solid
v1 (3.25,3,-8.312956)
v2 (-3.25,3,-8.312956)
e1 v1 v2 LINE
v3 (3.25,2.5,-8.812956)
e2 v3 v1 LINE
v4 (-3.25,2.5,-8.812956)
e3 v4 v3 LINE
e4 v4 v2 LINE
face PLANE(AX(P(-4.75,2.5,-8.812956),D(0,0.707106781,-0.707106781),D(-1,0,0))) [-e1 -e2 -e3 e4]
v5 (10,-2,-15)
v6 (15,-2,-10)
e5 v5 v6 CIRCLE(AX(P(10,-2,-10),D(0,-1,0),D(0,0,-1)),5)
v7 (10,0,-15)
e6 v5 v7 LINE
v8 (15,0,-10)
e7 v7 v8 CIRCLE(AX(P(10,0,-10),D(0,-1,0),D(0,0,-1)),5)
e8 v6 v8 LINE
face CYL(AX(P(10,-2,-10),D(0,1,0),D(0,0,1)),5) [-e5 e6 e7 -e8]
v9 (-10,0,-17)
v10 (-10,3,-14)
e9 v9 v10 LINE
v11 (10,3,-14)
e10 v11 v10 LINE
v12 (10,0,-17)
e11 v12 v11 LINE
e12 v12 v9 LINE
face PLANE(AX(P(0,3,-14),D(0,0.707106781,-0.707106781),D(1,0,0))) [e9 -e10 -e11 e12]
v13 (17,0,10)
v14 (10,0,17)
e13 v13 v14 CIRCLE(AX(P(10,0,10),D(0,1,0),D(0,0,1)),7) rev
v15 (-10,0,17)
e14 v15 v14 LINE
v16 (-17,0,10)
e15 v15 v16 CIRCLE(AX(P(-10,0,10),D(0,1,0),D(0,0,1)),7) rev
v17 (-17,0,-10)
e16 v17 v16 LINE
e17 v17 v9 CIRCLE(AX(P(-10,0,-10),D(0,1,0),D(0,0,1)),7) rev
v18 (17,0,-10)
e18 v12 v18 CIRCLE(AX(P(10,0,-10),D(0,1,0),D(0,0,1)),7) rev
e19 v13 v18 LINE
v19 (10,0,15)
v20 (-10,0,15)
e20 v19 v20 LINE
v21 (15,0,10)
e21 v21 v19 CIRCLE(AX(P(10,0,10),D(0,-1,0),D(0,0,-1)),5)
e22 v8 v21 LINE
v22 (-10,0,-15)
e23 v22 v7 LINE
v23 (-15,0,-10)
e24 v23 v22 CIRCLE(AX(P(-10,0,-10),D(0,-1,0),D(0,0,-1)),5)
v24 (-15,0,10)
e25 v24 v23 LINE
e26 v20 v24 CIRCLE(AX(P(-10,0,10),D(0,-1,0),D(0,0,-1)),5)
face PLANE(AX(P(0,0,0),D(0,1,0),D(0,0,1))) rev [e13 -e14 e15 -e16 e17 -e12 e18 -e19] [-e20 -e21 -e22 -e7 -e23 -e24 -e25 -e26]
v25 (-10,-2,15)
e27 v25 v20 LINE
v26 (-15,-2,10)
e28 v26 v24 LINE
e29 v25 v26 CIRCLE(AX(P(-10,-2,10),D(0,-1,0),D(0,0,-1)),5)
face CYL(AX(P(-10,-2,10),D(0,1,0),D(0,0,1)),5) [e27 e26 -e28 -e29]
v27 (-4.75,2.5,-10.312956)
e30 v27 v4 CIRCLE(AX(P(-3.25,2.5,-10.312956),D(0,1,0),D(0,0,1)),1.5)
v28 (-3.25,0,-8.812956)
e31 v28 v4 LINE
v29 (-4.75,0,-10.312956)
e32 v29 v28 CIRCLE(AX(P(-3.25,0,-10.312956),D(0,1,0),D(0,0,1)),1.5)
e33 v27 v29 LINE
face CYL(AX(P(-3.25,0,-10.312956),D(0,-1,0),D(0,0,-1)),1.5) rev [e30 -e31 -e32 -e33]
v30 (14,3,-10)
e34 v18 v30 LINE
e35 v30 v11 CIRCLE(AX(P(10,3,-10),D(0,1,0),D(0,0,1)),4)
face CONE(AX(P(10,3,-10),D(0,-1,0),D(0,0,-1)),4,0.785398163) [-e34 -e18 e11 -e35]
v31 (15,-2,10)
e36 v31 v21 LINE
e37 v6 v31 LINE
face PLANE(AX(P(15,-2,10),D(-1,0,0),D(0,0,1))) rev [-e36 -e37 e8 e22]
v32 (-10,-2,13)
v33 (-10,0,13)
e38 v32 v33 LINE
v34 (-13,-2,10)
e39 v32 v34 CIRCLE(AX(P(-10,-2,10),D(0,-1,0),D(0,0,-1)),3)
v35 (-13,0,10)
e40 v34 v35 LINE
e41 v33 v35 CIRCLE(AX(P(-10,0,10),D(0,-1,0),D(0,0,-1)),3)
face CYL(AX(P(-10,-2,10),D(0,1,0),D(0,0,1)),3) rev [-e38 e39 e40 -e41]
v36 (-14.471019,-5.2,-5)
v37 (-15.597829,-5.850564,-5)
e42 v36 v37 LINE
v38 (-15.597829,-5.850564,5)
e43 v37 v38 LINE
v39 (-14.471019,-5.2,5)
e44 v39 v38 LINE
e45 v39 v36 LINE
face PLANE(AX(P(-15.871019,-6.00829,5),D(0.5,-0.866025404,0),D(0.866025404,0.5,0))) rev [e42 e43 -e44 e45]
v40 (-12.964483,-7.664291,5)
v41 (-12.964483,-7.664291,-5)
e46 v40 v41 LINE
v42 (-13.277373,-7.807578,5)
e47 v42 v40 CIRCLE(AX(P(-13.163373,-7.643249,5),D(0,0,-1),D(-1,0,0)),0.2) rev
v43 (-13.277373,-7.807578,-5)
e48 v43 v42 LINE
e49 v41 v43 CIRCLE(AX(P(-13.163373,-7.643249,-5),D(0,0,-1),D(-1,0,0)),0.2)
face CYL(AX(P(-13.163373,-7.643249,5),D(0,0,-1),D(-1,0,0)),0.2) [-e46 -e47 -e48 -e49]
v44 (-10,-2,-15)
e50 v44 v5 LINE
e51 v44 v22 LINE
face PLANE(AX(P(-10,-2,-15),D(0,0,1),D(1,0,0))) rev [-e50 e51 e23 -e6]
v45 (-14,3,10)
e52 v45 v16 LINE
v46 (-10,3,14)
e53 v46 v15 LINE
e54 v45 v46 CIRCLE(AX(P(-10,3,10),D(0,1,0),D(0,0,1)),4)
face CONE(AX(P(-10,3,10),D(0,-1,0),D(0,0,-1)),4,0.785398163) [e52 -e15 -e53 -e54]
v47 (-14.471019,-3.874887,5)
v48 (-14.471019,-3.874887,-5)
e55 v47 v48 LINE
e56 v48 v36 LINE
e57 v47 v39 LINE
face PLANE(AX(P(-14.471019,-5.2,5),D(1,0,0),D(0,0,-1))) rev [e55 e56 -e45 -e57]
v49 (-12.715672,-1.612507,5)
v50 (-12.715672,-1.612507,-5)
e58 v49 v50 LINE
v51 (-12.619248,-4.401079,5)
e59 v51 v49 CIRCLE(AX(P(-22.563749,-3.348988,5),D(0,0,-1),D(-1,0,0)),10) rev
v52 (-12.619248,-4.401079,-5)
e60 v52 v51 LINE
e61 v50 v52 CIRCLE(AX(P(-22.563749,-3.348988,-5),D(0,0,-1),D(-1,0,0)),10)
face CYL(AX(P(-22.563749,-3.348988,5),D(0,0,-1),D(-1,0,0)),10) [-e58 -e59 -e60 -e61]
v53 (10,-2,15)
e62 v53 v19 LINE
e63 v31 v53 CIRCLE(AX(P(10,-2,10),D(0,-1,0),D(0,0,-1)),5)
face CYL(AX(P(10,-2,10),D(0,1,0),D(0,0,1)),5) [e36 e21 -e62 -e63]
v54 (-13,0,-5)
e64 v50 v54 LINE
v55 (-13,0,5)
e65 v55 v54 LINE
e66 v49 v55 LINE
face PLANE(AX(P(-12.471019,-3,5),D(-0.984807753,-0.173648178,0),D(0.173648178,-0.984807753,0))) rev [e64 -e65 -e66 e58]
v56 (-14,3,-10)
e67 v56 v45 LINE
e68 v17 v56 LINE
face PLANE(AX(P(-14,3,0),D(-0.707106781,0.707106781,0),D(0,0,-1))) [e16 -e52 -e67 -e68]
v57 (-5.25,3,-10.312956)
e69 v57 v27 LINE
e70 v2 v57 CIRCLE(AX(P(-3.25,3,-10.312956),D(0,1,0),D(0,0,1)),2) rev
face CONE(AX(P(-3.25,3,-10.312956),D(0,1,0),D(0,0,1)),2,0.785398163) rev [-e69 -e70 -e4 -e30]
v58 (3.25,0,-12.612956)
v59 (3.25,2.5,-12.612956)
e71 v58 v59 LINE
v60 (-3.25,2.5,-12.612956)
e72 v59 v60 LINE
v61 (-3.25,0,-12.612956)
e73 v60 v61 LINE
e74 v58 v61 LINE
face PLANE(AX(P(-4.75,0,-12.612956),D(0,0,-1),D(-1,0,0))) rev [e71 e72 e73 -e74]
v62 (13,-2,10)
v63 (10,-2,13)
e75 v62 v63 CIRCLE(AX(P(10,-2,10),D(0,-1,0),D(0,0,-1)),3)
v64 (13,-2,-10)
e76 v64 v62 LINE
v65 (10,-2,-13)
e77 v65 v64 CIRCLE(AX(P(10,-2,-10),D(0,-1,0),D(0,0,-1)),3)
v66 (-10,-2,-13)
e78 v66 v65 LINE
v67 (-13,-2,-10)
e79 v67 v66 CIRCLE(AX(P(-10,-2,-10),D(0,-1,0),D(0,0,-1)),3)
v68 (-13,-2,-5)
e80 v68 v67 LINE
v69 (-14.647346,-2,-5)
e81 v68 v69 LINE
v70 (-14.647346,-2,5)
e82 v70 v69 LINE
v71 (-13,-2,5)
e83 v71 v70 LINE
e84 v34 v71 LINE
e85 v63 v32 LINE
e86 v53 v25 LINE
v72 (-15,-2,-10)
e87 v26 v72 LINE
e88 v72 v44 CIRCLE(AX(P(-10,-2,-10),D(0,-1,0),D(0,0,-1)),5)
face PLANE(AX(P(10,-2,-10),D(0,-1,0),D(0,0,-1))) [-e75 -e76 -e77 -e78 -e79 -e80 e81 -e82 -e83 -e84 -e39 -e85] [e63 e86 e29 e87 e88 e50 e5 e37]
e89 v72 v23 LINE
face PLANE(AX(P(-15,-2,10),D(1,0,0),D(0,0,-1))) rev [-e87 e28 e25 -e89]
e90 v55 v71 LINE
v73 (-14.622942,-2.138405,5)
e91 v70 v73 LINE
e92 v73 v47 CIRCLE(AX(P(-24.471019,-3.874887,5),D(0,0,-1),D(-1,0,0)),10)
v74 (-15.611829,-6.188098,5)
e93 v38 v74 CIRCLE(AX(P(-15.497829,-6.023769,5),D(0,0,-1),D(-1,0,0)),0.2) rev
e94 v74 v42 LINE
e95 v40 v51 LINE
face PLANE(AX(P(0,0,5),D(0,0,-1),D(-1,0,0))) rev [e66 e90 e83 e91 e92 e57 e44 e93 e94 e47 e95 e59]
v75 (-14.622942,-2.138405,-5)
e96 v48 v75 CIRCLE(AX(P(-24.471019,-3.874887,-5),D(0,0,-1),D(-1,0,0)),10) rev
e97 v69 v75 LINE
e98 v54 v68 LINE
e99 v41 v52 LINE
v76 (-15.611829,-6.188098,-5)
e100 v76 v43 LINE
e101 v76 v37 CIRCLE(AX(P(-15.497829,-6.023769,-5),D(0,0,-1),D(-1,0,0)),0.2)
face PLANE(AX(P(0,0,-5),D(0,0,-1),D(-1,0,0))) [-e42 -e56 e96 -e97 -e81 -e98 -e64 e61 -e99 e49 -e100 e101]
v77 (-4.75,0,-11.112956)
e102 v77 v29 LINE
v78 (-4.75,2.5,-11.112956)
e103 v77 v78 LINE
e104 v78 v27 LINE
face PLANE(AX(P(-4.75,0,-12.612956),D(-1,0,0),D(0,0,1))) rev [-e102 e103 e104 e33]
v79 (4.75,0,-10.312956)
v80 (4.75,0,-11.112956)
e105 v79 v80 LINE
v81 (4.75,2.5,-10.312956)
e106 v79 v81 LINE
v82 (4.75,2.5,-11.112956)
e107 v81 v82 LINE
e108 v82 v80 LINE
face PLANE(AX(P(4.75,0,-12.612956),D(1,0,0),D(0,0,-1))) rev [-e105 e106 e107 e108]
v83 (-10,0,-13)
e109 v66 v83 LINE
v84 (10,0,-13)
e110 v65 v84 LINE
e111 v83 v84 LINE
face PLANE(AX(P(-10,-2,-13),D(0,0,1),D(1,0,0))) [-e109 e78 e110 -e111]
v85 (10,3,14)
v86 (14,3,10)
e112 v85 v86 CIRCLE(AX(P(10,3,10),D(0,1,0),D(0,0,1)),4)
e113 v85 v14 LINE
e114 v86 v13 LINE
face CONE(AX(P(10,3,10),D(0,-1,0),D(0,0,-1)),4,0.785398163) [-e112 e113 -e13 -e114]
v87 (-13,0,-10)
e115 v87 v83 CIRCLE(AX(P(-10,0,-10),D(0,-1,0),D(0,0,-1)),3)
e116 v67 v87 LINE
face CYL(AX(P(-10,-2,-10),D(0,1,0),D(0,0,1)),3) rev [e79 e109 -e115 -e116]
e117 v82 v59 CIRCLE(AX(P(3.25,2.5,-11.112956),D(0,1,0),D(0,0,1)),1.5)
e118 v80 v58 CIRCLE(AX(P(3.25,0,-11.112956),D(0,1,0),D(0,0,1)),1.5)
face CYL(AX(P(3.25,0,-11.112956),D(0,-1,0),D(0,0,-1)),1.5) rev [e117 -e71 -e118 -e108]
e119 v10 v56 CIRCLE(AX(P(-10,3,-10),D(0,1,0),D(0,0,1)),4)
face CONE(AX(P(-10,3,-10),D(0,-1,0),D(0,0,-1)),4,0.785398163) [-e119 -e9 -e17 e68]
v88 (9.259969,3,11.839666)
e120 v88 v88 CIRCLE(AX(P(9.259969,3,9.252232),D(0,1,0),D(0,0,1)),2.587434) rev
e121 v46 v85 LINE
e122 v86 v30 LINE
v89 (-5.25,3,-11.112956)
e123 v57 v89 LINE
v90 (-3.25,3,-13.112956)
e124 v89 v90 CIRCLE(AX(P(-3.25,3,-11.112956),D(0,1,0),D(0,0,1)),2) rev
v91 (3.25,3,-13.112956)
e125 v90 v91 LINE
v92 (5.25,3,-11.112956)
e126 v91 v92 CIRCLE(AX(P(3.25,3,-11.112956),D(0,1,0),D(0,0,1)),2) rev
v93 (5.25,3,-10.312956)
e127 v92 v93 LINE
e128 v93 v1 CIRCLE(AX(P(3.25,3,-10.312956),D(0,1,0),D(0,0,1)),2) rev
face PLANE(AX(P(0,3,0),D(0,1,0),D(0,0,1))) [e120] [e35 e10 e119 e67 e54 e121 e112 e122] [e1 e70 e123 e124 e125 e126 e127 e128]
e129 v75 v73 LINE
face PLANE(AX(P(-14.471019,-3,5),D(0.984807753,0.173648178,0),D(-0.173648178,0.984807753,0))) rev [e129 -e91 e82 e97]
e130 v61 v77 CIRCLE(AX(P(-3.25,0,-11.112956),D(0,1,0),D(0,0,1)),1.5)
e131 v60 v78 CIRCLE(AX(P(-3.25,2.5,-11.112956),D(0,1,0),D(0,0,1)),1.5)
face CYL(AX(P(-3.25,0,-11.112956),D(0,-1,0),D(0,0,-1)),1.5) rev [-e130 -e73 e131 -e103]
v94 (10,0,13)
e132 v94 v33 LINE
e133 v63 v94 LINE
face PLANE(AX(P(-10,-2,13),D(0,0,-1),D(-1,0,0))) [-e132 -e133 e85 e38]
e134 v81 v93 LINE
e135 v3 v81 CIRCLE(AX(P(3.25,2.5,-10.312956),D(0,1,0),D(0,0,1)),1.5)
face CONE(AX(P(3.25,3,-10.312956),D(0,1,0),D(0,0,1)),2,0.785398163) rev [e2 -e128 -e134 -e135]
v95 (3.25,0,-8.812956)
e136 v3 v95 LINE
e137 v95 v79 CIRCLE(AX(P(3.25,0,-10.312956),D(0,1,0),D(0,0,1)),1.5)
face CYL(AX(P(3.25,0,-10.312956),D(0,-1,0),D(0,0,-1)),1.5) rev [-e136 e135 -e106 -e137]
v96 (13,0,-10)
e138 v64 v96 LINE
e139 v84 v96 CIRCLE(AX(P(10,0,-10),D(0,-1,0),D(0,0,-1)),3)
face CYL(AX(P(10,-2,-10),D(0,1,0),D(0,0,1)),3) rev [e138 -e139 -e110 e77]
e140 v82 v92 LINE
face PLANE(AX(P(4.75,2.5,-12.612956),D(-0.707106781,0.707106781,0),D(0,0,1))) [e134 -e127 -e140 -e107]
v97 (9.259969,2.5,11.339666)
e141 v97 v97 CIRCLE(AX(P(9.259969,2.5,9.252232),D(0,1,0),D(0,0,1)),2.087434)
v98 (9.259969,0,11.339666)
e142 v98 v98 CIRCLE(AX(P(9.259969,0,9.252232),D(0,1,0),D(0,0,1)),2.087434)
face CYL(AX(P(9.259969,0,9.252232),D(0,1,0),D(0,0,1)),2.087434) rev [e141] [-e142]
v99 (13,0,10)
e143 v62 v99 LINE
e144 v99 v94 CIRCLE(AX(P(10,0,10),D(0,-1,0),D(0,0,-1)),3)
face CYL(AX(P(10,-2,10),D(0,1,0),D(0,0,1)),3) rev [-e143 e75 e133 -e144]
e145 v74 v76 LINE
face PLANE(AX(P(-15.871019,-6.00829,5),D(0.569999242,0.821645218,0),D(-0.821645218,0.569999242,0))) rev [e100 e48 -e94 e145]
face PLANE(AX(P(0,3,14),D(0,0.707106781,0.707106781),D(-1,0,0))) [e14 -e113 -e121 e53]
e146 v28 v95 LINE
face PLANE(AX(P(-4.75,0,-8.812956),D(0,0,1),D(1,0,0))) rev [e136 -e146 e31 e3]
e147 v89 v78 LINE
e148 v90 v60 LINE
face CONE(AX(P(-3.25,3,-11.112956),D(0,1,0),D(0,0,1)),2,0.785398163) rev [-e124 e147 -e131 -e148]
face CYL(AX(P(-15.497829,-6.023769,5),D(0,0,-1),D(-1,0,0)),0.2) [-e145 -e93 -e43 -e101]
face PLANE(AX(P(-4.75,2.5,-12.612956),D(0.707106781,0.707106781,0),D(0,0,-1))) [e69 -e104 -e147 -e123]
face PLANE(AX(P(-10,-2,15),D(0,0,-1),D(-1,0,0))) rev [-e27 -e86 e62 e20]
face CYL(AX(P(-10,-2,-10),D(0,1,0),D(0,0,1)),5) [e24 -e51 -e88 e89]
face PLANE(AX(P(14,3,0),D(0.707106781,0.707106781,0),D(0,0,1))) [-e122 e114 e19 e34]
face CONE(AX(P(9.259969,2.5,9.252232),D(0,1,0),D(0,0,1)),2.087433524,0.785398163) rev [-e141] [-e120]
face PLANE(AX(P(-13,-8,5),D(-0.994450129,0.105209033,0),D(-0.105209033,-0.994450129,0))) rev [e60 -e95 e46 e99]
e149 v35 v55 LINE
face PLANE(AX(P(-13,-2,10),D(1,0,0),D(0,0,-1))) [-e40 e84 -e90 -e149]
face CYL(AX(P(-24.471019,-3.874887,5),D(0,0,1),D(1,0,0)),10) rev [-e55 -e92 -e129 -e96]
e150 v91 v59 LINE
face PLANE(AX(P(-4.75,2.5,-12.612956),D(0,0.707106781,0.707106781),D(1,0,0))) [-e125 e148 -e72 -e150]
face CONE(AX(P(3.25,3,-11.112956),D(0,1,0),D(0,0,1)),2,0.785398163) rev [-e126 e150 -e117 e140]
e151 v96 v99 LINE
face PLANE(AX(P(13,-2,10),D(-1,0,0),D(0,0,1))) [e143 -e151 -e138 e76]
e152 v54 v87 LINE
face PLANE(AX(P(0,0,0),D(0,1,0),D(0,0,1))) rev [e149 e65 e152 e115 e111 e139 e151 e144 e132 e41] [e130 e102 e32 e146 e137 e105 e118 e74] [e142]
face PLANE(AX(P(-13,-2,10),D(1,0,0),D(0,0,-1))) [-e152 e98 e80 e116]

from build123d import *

# Parameters (mm, degrees)
CROQUIS1_W              = 34
CROQUIS1_H              = 34
SALIENTE_EXTRUIR1_DEPTH = 3
REDONDEO1_R             = 7
CHAFL_N1_SIZE           = 3
CROQUIS2_R              = 2.087433524
CROQUIS2_W              = 9.5
CROQUIS2_H              = 3.8
CORTAR_EXTRUIR1_DEPTH   = 25.228082879
REDONDEO2_R             = 1.5
CHAFL_N2_SIZE           = 0.5
SALIENTE_EXTRUIR2_DEPTH = 5
REDONDEO3_R             = 0.2
REDONDEO4_R             = 0.2
REDONDEO5_R             = 10
SALIENTE_EXTRUIR3_DEPTH = 2


with BuildPart() as part:
    # Croquis1 → Saliente-Extruir1 (new body)
    with BuildSketch(Plane(origin=(0, 0, 0), x_dir=(1, 0, 0), z_dir=(0, 1, 0))):
        Rectangle(CROQUIS1_W, CROQUIS1_H)
    extrude(amount=SALIENTE_EXTRUIR1_DEPTH)

    # Redondeo1
    redondeo1_edges = [part.edges().sort_by_distance(p)[0] for p in [
        (17, 1.5, 17),
        (-17, 1.5, 17),
        (-17, 1.5, -17),
        (17, 1.5, -17),
    ]]
    fillet(redondeo1_edges, radius=REDONDEO1_R)

    # Chaflán1
    chafl_n1_edges = [part.edges().sort_by_distance(p)[0] for p in [
        (17, 3, 0),
        (14.949747468, 3, -14.949747468),
        (14.949747468, 3, 14.949747468),
        (0, 3, -17),
        (0, 3, 17),
        (-14.949747468, 3, -14.949747468),
        (-14.949747468, 3, 14.949747468),
        (-17, 3, 0),
    ]]
    chamfer(chafl_n1_edges, length=CHAFL_N1_SIZE - 0.0001)  # a hair under: the kernel refuses the full size

    # Croquis2 → Cortar-Extruir1 (cut, through all)
    with BuildSketch(Plane(origin=(0, 3, 0), x_dir=(1, 0, 0), z_dir=(0, 1, 0))):
        with Locations(Location((9.259969099, -9.25223211, 0), (0, 0, 270))):
            Circle(CROQUIS2_R)
        with Locations((0, 10.712955835)):
            Rectangle(CROQUIS2_W, CROQUIS2_H)
    extrude(amount=-CORTAR_EXTRUIR1_DEPTH, mode=Mode.SUBTRACT)

    # Redondeo2
    redondeo2_edges = [part.edges().sort_by_distance(p)[0] for p in [
        (4.75, 1.5, -12.612955835),
        (4.75, 1.5, -8.812955835),
        (-4.75, 1.5, -8.812955835),
        (-4.75, 1.5, -12.612955835),
    ]]
    fillet(redondeo2_edges, radius=REDONDEO2_R)

    # Chaflán2
    chafl_n2_edges = [part.edges().sort_by_distance(p)[0] for p in [
        (9.259969099, 3, 7.164798586),
        (0, 3, -8.812955835),
        (-4.75, 3, -10.712955835),
        (4.75, 3, -10.712955835),
        (0, 3, -12.612955835),
        (-4.310660172, 3, -9.252295663),
        (4.310660172, 3, -9.252295663),
        (4.310660172, 3, -12.173616007),
        (-4.310660172, 3, -12.173616007),
    ]]
    chamfer(chafl_n2_edges, length=CHAFL_N2_SIZE)

    # Croquis3 → Saliente-Extruir2 (add, symmetric)
    with BuildSketch(Plane.XY):
        Polygon((-15.871019058, -6.008290377), (-14.471019058, -5.2), (-14.471019058, -3), (-15, 0), (-13, 0), (-12.471019058, -3), (-13, -8), align=None)
    extrude(amount=SALIENTE_EXTRUIR2_DEPTH, both=True)

    # Redondeo3
    redondeo3_edges = [part.edges().sort_by_distance(p)[0] for p in [
        (-13, -8, 0),
    ]]
    fillet(redondeo3_edges, radius=REDONDEO3_R)

    # Redondeo4
    redondeo4_edges = [part.edges().sort_by_distance(p)[0] for p in [
        (-15.871019058, -6.008290377, 0),
    ]]
    fillet(redondeo4_edges, radius=REDONDEO4_R)

    # Redondeo5
    redondeo5_edges = [part.edges().sort_by_distance(p)[0] for p in [
        (-14.471019058, -3, 0),
        (-12.471019058, -3, 0),
    ]]
    fillet(redondeo5_edges, radius=REDONDEO5_R)

    # Croquis4 → Saliente-Extruir3 (add)
    with BuildSketch(Plane.XZ):
        with BuildLine():
            Line((-10, 15), (10, 15))
            ThreePointArc((10, 15), (13.535533906, 13.535533906), (15, 10))
            Line((15, 10), (15, -10))
            ThreePointArc((15, -10), (13.535533906, -13.535533906), (10, -15))
            Line((10, -15), (-10, -15))
            ThreePointArc((-10, -15), (-13.535533906, -13.535533906), (-15, -10))
            Line((-15, -10), (-15, 10))
            ThreePointArc((-15, 10), (-13.535533906, 13.535533906), (-10, 15))
        make_face()
        with BuildLine():
            Line((-13, 10), (-13, -10))
            ThreePointArc((-13, -10), (-12.121320344, -12.121320344), (-10, -13))
            Line((-10, -13), (10, -13))
            ThreePointArc((10, -13), (12.121320344, -12.121320344), (13, -10))
            Line((13, -10), (13, 10))
            ThreePointArc((13, 10), (12.121320344, 12.121320344), (10, 13))
            Line((10, 13), (-10, 13))
            ThreePointArc((-10, 13), (-12.121320344, 12.121320344), (-13, 10))
        make_face(mode=Mode.SUBTRACT)
    extrude(amount=SALIENTE_EXTRUIR3_DEPTH)


solid = part.part
